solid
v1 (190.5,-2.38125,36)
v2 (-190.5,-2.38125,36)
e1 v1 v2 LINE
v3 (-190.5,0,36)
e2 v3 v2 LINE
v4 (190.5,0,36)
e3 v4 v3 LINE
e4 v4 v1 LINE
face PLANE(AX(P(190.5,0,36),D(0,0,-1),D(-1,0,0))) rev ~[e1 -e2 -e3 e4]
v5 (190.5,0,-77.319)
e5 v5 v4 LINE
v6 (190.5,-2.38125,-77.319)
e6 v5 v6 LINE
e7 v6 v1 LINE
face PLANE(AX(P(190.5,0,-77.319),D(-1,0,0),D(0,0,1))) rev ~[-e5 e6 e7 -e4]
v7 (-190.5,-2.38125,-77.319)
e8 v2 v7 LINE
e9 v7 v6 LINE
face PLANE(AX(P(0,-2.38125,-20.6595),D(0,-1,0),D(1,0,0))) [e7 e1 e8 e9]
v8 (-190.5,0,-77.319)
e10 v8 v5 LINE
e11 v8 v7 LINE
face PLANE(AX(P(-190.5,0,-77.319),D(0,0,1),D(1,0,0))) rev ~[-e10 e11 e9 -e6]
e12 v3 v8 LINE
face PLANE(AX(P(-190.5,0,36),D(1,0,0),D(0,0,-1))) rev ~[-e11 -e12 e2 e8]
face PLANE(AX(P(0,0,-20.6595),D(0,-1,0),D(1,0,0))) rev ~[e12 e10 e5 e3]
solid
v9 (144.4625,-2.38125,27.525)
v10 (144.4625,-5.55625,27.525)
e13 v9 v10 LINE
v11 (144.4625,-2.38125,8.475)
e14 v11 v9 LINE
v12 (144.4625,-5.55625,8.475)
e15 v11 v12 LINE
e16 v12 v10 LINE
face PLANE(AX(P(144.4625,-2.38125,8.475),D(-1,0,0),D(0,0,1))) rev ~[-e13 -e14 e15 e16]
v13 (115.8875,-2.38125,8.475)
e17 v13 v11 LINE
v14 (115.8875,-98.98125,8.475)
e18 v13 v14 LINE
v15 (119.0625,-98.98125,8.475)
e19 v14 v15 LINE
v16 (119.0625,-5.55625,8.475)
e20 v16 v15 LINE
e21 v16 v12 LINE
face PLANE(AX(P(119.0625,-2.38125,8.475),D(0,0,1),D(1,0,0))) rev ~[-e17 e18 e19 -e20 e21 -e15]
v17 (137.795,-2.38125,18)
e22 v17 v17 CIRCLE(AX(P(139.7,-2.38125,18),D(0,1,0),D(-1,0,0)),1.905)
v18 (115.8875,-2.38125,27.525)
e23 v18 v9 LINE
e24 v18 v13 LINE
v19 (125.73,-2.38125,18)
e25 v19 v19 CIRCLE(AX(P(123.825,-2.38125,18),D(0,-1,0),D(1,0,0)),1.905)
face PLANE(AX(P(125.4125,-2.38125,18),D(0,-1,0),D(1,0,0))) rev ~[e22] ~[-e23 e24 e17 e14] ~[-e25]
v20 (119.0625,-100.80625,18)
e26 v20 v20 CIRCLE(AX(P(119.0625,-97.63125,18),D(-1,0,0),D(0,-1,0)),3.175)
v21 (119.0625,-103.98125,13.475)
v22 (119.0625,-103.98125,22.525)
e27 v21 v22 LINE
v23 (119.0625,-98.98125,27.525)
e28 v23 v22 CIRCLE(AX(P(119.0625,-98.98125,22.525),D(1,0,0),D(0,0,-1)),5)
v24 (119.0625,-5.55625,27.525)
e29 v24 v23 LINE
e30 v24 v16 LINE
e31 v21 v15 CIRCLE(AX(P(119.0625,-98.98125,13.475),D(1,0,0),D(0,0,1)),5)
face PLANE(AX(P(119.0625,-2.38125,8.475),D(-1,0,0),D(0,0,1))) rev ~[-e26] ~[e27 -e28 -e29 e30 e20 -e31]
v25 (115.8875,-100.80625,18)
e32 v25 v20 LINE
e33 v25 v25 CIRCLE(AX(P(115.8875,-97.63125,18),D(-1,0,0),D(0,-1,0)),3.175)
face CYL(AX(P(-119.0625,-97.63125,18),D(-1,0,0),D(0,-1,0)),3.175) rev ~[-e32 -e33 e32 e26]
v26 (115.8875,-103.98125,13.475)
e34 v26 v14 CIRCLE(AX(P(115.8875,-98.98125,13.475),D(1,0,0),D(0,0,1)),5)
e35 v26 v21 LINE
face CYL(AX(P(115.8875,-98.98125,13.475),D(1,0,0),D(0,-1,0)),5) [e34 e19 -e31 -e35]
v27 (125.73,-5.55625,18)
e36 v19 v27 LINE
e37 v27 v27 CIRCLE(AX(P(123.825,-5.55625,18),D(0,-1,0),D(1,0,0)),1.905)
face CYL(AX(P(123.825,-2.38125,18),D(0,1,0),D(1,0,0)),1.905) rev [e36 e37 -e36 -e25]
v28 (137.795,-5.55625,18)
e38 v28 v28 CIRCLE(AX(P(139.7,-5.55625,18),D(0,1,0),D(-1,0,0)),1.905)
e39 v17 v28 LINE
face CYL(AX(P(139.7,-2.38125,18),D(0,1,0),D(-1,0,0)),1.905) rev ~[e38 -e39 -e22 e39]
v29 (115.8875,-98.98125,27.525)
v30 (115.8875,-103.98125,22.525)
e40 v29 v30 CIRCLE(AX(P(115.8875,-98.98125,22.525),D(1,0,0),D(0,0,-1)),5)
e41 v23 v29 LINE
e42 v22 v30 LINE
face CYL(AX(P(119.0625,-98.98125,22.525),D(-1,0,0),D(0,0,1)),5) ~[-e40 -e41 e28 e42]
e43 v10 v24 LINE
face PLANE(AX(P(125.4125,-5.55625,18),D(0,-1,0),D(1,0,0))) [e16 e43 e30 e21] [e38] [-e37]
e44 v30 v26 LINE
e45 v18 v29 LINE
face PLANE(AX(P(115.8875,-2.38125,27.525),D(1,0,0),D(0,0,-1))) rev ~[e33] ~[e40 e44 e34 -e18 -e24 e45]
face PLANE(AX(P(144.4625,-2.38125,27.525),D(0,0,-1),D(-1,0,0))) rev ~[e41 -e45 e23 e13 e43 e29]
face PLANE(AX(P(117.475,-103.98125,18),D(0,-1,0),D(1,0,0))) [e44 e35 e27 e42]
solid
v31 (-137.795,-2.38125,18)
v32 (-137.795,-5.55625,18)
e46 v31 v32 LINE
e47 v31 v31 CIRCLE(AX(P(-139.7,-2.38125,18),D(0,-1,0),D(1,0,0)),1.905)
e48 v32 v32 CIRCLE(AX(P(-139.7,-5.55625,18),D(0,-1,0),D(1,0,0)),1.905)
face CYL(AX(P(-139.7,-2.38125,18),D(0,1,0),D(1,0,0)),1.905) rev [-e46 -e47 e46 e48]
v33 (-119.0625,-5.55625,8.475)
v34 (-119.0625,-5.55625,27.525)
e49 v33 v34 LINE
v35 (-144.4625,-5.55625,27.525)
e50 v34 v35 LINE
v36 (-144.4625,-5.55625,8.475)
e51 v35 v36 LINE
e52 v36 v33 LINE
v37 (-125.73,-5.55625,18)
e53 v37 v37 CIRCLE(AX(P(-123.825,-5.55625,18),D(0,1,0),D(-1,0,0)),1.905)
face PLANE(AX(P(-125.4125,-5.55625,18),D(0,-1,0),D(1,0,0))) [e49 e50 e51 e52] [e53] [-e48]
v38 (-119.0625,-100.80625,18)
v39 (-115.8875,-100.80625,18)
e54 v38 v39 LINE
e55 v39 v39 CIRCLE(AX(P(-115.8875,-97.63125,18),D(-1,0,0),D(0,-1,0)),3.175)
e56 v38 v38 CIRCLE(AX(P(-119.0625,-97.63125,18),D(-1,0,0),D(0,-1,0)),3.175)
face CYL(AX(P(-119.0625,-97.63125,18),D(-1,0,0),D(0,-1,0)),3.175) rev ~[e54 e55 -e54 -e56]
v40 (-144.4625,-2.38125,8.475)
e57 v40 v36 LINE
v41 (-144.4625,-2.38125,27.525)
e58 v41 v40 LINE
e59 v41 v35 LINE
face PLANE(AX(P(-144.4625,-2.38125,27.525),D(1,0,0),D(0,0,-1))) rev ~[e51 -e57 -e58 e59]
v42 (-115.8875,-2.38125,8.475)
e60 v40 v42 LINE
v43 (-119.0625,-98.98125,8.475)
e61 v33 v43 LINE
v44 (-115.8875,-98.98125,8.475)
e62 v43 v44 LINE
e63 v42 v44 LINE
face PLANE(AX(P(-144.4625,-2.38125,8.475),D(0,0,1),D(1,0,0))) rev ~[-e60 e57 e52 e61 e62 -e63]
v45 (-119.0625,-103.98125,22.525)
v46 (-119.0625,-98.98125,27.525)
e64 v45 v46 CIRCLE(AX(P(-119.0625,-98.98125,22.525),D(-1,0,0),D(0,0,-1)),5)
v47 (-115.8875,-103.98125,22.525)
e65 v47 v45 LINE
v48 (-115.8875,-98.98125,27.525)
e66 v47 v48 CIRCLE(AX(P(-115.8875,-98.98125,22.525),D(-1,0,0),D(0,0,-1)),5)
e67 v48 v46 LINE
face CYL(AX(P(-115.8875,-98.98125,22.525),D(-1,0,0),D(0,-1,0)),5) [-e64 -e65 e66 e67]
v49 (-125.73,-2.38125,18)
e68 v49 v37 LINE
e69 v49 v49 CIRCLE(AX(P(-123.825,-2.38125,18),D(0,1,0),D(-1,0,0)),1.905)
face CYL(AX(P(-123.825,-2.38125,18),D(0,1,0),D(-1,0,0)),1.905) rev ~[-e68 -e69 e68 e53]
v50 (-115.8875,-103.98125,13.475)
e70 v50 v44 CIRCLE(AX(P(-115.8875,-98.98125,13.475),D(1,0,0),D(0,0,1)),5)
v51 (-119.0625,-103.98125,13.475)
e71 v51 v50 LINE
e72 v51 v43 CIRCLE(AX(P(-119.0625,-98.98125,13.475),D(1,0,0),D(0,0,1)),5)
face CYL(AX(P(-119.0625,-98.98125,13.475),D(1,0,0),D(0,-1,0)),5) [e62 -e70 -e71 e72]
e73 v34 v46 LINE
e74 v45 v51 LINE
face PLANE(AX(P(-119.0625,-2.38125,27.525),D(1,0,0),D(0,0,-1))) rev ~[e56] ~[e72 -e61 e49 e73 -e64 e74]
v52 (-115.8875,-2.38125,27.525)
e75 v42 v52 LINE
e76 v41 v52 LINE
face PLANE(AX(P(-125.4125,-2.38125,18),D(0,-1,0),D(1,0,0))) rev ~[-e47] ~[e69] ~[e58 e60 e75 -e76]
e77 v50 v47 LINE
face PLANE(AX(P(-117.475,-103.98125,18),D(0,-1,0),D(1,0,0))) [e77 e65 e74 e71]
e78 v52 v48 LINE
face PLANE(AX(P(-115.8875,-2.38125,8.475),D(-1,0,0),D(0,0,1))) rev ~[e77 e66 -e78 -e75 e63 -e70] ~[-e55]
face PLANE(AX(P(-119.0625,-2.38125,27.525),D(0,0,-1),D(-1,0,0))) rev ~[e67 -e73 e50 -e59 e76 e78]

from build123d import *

# Parameters (mm, degrees)
F1_DEPTH  = 2.38125
F3_DEPTH  = 101.6
F5_DEPTH  = 25000
F6_R      = 5
F7_R      = 5
F8_R      = 5
F9_R      = 1.905
F10_DEPTH = 3.175


# Not quite as in the source:
# - a length typed as a fraction of an inch, garbled in the dataset ("3 / 203.2 mm" for 3/8 in), is restored


with BuildPart() as f1:
    # F0 (on Front) → F1 (new body)
    with BuildSketch(Plane.XZ):
        Polygon((190.5, -36), (190.5, 36), (-190.5, 36), (-190.5, -36), (-190.5, -77.319), (190.5, -77.319), align=None)
    extrude(amount=F1_DEPTH)


with BuildPart() as f3:
    # F2 (on face) → F3 (new body)
    with BuildSketch(Plane.XZ.offset(2.38125)):
        Polygon((115.8875, 27.525), (115.8875, 18), (115.8875, 8.475), (119.0625, 8.475), (119.0625, 18), (119.0625, 27.525), align=None)
    extrude(amount=F3_DEPTH)


with BuildPart() as f3b:
    # F2 (on face) → F3, piece 2 (new body)
    with BuildSketch(Plane.XZ.offset(2.38125)):
        Polygon((-115.8875, 8.475), (-115.8875, 18), (-115.8875, 27.525), (-119.0625, 27.525), (-119.0625, 18), (-119.0625, 8.475), align=None)
    extrude(amount=F3_DEPTH)


with BuildPart() as f5_tool:
    # F4 (on face) → F5 (new body)
    with BuildSketch(Plane(origin=(-119.0625, 0, 0), x_dir=(0, -1, 0), z_dir=(-1, 0, 0))):
        with BuildLine():
            ThreePointArc((94.45625, 18), (97.63125, 14.825), (100.80625, 18))
            ThreePointArc((100.80625, 18), (97.63125, 21.175), (94.45625, 18))
        make_face()
    extrude(amount=-F5_DEPTH)


with BuildPart() as f3_1:
    add(f3.part)

    # F5: cut by f5_tool
    add(f5_tool.part, mode=Mode.SUBTRACT)

    # F8
    f8_edges = [f3_1.edges().sort_by_distance(p)[0] for p in [
        (117.475, -103.98125, 27.525),
        (117.475, -103.98125, 8.475),
    ]]
    fillet(f8_edges, radius=F8_R)

    # F9 (on face) → F10, piece 2 (join)
    with BuildSketch(Plane.XZ.offset(2.38125)):
        Polygon((119.0625, 18), (119.0625, 8.475), (131.7625, 8.475), (131.7625, 18), (131.7625, 27.525), (119.0625, 27.525), align=None)
        with Locations((123.825, 18)):
            Circle(F9_R, mode=Mode.SUBTRACT)
        Polygon((131.7625, 18), (131.7625, 8.475), (144.4625, 8.475), (144.4625, 27.525), (131.7625, 27.525), align=None)
        with BuildLine():
            ThreePointArc((141.605, 18), (139.7, 16.095), (137.795, 18))
            ThreePointArc((137.795, 18), (139.7, 19.905), (141.605, 18))
        make_face(mode=Mode.SUBTRACT)
    extrude(amount=F10_DEPTH)


with BuildPart() as f3b_1:
    add(f3b.part)

    # F5: cut by f5_tool
    add(f5_tool.part, mode=Mode.SUBTRACT)

    # F6
    f6_edges = [f3b_1.edges().sort_by_distance(p)[0] for p in [
        (-117.475, -103.98125, 27.525),
    ]]
    fillet(f6_edges, radius=F6_R)

    # F7
    f7_edges = [f3b_1.edges().sort_by_distance(p)[0] for p in [
        (-117.475, -103.98125, 8.475),
    ]]
    fillet(f7_edges, radius=F7_R)

    # F9 (on face) → F10 (join)
    with BuildSketch(Plane.XZ.offset(2.38125)):
        Polygon((-131.7625, 8.475), (-119.0625, 8.475), (-119.0625, 18), (-119.0625, 27.525), (-131.7625, 27.525), (-131.7625, 18), align=None)
        with BuildLine():
            ThreePointArc((-121.92, 18), (-123.825, 16.095), (-125.73, 18))
            ThreePointArc((-125.73, 18), (-123.825, 19.905), (-121.92, 18))
        make_face(mode=Mode.SUBTRACT)
        Polygon((-144.4625, 8.475), (-131.7625, 8.475), (-131.7625, 18), (-131.7625, 27.525), (-144.4625, 27.525), align=None)
        with Locations((-139.7, 18)):
            Circle(F9_R, mode=Mode.SUBTRACT)
    extrude(amount=F10_DEPTH)


solid = Compound([f1.part, f3_1.part, f3b_1.part])
